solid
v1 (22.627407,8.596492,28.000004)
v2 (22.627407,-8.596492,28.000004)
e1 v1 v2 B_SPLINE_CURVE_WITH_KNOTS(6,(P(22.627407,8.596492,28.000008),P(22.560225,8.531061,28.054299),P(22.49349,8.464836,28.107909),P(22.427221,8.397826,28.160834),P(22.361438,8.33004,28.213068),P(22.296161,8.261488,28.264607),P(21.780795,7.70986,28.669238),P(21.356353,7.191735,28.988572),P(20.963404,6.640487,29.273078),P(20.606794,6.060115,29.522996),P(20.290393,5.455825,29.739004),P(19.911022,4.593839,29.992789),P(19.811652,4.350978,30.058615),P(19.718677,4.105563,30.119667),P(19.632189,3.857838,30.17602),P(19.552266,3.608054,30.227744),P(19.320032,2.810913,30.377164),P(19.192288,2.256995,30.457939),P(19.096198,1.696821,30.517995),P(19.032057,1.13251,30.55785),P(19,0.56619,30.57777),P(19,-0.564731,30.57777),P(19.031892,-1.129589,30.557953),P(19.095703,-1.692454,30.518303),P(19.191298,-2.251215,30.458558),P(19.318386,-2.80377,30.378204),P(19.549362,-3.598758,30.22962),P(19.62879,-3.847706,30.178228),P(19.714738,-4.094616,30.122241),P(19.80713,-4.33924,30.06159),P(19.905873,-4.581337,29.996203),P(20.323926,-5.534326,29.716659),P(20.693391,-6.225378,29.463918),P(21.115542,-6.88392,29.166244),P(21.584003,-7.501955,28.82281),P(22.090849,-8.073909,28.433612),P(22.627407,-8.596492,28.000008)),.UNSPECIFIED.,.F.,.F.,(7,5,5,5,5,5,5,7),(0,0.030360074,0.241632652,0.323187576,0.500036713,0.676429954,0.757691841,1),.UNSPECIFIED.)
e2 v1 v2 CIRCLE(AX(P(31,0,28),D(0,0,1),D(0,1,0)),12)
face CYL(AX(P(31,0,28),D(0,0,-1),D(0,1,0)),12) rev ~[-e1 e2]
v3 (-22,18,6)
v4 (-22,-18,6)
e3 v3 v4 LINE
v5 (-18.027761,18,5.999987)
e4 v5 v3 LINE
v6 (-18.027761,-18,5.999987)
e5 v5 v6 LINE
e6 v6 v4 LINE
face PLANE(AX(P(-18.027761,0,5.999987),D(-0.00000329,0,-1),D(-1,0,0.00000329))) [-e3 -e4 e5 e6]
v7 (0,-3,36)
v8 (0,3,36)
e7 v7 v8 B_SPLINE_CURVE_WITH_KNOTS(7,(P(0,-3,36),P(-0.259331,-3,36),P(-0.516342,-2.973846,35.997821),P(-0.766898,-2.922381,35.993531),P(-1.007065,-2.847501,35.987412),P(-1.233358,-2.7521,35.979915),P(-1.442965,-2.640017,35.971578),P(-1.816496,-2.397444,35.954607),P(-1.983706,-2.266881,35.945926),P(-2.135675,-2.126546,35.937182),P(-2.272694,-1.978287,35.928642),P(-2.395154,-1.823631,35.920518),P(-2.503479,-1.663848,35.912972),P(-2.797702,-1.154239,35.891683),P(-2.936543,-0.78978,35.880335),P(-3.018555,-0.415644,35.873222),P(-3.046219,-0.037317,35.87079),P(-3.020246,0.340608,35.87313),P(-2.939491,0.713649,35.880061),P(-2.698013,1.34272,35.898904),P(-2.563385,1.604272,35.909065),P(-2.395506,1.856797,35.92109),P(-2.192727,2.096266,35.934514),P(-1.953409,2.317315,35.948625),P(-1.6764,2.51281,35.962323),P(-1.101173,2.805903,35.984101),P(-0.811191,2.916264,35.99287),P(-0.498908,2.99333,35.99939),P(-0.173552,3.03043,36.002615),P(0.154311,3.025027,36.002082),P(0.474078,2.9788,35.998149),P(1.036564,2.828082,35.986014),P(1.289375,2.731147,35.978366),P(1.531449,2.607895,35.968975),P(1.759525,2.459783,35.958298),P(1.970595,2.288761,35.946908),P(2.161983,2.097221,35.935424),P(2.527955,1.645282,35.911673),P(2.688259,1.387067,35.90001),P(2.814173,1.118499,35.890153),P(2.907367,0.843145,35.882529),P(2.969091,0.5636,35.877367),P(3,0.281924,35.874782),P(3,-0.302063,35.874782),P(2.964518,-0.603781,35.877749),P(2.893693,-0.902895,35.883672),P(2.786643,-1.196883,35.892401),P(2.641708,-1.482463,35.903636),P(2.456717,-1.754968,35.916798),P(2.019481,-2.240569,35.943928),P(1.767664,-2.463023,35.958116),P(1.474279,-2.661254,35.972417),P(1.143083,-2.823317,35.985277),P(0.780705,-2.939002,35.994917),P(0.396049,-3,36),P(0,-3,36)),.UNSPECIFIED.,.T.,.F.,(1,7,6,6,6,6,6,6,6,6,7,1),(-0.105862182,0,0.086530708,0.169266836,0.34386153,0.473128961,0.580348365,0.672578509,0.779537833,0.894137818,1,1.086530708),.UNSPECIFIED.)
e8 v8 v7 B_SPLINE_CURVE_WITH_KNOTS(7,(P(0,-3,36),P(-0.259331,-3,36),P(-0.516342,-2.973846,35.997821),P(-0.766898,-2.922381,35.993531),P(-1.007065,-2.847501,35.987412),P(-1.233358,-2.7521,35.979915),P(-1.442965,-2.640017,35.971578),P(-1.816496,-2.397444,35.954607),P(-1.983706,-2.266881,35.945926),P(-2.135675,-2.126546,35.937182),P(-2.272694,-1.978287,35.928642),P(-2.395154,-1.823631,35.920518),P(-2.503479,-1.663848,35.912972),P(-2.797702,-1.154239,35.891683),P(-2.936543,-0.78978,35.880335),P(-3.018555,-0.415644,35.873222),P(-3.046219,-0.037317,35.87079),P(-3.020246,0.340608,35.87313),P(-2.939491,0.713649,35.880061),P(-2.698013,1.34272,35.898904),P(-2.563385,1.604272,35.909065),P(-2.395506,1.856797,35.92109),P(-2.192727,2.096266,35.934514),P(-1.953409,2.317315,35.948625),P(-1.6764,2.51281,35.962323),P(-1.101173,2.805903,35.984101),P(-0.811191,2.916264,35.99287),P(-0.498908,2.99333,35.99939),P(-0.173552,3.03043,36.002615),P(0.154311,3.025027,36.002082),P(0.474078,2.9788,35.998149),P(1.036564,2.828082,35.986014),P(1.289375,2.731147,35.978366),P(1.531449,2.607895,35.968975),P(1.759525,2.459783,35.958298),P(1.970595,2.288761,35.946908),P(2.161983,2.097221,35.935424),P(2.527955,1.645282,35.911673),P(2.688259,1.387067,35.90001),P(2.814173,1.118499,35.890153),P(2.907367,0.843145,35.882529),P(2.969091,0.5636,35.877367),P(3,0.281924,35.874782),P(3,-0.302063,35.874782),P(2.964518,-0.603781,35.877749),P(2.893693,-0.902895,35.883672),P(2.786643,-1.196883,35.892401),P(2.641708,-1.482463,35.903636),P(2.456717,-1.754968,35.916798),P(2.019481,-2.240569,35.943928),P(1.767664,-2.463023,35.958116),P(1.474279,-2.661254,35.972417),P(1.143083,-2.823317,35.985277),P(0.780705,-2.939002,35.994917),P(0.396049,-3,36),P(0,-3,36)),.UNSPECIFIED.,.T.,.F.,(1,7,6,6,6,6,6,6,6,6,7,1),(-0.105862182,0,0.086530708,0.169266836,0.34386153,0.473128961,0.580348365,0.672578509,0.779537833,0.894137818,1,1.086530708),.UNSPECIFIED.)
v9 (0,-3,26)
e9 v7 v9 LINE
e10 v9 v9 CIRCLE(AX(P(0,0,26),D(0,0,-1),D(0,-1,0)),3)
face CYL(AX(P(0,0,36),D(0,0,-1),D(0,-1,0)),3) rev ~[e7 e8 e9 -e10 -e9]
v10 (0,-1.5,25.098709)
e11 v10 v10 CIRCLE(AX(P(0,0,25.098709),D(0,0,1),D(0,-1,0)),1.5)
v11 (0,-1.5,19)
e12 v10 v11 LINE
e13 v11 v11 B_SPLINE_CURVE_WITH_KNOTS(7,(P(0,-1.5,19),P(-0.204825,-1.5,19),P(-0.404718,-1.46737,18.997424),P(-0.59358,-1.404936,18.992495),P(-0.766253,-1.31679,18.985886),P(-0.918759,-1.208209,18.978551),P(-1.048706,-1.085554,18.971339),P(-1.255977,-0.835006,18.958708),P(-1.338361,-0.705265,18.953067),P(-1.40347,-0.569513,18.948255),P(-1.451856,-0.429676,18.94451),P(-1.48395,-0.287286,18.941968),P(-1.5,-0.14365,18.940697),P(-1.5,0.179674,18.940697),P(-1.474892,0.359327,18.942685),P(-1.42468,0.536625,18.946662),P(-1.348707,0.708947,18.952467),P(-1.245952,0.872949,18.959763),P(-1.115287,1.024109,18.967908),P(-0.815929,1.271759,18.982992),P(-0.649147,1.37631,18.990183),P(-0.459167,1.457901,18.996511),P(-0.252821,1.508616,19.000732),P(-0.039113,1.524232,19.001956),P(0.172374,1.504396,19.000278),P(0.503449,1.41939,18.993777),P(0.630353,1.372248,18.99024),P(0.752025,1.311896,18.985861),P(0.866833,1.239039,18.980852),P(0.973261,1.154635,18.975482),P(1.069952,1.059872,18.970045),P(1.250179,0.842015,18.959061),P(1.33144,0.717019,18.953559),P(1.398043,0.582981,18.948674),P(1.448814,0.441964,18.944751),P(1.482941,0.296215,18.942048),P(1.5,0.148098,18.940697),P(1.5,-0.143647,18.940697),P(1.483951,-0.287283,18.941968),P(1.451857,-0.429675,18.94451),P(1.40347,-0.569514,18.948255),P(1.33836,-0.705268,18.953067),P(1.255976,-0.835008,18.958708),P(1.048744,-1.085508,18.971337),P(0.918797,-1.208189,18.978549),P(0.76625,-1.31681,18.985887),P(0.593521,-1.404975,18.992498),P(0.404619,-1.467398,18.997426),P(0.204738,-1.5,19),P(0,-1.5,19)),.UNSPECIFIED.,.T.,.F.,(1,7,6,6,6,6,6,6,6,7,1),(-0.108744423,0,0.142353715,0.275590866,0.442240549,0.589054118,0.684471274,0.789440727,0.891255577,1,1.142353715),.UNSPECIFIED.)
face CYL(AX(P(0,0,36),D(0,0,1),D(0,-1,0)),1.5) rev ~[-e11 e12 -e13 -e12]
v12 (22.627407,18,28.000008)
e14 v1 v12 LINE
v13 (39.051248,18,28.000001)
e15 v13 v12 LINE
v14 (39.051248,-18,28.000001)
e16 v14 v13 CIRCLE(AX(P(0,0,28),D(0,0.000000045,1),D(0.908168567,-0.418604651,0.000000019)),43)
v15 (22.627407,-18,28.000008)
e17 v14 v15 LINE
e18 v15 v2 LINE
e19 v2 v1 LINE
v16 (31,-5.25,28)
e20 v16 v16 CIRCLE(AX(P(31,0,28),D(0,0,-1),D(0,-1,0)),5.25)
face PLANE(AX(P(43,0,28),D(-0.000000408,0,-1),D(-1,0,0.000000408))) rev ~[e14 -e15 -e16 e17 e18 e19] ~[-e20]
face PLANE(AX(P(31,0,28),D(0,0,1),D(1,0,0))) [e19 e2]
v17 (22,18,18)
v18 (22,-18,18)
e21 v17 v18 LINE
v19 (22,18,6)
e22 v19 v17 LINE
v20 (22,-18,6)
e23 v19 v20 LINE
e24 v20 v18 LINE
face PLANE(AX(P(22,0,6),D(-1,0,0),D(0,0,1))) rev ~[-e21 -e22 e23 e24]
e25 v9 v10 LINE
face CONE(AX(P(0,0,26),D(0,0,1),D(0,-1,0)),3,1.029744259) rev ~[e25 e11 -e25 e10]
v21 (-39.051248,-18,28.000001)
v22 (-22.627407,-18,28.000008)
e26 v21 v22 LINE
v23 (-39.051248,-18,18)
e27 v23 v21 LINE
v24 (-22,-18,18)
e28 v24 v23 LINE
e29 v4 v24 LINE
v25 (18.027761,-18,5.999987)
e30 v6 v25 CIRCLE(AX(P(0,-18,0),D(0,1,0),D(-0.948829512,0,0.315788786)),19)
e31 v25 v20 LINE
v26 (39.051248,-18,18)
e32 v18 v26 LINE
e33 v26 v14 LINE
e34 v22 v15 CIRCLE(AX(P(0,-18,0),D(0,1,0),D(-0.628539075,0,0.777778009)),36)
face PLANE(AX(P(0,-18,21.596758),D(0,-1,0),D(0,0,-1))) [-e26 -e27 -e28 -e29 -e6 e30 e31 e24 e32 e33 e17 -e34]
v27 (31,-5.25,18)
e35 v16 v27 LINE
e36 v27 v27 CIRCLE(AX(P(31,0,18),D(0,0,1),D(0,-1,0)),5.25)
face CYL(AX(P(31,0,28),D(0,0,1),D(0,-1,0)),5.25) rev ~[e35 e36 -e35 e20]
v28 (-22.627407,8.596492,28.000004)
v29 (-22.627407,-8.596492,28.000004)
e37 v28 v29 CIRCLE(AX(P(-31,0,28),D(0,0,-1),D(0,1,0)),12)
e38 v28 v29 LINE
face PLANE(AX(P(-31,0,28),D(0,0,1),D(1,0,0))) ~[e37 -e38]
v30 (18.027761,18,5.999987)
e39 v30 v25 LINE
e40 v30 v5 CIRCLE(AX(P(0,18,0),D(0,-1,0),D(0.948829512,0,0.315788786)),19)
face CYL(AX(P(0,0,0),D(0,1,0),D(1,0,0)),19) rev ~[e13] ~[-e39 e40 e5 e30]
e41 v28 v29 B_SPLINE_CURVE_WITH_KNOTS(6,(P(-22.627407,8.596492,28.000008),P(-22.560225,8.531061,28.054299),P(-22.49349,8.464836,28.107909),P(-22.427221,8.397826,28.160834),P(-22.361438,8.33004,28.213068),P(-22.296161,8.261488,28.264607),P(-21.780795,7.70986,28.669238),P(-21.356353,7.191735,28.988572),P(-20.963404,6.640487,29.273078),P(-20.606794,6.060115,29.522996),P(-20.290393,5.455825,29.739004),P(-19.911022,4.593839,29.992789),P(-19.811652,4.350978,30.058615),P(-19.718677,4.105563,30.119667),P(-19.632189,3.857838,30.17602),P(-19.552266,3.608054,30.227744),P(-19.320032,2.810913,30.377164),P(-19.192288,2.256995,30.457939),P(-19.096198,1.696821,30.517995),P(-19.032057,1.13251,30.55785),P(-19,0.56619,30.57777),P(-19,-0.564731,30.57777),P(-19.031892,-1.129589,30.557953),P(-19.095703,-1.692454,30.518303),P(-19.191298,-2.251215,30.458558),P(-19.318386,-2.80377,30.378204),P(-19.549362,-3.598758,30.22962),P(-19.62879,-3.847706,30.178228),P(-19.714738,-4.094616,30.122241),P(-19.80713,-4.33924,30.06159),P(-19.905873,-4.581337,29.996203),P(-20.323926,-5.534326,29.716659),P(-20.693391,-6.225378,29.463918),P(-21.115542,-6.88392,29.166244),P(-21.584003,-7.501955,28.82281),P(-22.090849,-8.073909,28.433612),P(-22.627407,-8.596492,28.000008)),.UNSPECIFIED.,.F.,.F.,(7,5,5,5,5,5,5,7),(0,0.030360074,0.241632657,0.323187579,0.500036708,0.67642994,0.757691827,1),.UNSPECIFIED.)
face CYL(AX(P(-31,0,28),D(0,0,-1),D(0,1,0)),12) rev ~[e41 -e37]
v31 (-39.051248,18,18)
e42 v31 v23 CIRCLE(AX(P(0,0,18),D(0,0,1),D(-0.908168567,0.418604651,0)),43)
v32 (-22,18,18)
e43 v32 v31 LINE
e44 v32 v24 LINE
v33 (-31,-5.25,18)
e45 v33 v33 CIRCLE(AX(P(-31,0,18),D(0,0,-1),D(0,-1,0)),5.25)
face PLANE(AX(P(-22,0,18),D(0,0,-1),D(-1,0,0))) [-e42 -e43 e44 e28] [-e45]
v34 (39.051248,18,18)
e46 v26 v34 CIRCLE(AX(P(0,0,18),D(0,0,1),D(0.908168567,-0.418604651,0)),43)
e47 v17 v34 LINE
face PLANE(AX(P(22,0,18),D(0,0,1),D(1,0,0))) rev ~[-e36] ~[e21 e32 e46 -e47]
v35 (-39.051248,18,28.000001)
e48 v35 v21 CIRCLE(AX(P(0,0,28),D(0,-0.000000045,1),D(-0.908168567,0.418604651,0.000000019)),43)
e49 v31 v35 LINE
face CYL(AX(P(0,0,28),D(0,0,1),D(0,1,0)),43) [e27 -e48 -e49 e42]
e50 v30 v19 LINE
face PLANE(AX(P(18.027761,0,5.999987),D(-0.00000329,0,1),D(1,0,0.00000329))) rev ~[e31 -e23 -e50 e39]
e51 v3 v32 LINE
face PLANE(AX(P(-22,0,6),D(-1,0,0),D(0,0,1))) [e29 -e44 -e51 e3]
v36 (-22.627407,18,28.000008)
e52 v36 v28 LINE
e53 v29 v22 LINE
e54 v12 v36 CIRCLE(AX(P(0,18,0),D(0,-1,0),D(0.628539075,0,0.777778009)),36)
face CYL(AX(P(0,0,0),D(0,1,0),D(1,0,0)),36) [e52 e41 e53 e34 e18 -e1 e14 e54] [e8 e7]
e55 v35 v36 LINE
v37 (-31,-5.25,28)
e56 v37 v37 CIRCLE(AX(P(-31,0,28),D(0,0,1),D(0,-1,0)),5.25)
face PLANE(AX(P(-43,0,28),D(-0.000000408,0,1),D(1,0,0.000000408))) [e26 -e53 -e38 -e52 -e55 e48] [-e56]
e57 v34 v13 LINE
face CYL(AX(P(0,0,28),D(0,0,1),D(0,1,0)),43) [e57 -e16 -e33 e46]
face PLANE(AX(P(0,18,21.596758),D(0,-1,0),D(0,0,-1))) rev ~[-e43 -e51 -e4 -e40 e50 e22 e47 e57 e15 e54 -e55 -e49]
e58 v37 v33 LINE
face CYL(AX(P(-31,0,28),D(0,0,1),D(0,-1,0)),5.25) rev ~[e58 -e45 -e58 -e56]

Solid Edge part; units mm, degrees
sketch "Sketch1" plane through (0, 0, 0) normal (0, -1, 0) x (1, 0, 0)
  arc A0 (0, 36) -> (-22.6274, 28) centre (0, 0) ccw
  line L0 (-43, 28) -> (-22.6274, 28)
  line L1 (-43, 18) -> (-43, 28)
  line L2 (-22, 18) -> (-43, 18)
  line L3 (-22, 6) -> (-22, 18)
  line L4 (-18.0278, 6) -> (-22, 6)
  arc A1 (0, 19) -> (-18.0278, 6) centre (0, 0) ccw
  arc A2 (0, 19) -> (18.0278, 6) centre (0, 0) cw
  line L5 (18.0278, 6) -> (22, 6)
  line L6 (22, 6) -> (22, 18)
  line L7 (22, 18) -> (43, 18)
  line L8 (43, 18) -> (43, 28)
  line L9 (43, 28) -> (22.6274, 28)
  arc A3 (0, 36) -> (22.6274, 28) centre (0, 0) cw
extrude "Protrusion1" add sketch "Sketch1" along normal mid plane 36
sketch "Sketch2" plane through (32.8137, 0, 28) normal (0, 0, 1) x (0, 1, 0)
  circle A0 centre (0, 32.8137) radius 43
  circle A1 centre (0, 32.8137) radius 50
extrude "ExtrudedCutout_1" cut sketch "Sketch2" against normal blind 61.9029
hole "Hole_1" at (31, 0, 28) direction (0, 0, -1) diameter 10.5 end up to next
sketch "Sketch3" plane through (32.8137, 0, 28) normal (0, 0, 1) x (0, 1, 0)
  circle A0 centre (0, 1.8137) radius 12
extrude "ExtrudedCutout_2" cut sketch "Sketch3" along normal blind 58.8824
mirror "Mirror1" about plane through (0, 0, 0) normal (1, 0, 0) of "Hole_1", "ExtrudedCutout_2"
hole "Hole_2" at (0, 0, 36) direction (0, 0, -1) diameter 6 depth 10 tip angle 118
hole "Hole_3" at (0, 0, 36) direction (0, 0, -1) diameter 3 end through all
